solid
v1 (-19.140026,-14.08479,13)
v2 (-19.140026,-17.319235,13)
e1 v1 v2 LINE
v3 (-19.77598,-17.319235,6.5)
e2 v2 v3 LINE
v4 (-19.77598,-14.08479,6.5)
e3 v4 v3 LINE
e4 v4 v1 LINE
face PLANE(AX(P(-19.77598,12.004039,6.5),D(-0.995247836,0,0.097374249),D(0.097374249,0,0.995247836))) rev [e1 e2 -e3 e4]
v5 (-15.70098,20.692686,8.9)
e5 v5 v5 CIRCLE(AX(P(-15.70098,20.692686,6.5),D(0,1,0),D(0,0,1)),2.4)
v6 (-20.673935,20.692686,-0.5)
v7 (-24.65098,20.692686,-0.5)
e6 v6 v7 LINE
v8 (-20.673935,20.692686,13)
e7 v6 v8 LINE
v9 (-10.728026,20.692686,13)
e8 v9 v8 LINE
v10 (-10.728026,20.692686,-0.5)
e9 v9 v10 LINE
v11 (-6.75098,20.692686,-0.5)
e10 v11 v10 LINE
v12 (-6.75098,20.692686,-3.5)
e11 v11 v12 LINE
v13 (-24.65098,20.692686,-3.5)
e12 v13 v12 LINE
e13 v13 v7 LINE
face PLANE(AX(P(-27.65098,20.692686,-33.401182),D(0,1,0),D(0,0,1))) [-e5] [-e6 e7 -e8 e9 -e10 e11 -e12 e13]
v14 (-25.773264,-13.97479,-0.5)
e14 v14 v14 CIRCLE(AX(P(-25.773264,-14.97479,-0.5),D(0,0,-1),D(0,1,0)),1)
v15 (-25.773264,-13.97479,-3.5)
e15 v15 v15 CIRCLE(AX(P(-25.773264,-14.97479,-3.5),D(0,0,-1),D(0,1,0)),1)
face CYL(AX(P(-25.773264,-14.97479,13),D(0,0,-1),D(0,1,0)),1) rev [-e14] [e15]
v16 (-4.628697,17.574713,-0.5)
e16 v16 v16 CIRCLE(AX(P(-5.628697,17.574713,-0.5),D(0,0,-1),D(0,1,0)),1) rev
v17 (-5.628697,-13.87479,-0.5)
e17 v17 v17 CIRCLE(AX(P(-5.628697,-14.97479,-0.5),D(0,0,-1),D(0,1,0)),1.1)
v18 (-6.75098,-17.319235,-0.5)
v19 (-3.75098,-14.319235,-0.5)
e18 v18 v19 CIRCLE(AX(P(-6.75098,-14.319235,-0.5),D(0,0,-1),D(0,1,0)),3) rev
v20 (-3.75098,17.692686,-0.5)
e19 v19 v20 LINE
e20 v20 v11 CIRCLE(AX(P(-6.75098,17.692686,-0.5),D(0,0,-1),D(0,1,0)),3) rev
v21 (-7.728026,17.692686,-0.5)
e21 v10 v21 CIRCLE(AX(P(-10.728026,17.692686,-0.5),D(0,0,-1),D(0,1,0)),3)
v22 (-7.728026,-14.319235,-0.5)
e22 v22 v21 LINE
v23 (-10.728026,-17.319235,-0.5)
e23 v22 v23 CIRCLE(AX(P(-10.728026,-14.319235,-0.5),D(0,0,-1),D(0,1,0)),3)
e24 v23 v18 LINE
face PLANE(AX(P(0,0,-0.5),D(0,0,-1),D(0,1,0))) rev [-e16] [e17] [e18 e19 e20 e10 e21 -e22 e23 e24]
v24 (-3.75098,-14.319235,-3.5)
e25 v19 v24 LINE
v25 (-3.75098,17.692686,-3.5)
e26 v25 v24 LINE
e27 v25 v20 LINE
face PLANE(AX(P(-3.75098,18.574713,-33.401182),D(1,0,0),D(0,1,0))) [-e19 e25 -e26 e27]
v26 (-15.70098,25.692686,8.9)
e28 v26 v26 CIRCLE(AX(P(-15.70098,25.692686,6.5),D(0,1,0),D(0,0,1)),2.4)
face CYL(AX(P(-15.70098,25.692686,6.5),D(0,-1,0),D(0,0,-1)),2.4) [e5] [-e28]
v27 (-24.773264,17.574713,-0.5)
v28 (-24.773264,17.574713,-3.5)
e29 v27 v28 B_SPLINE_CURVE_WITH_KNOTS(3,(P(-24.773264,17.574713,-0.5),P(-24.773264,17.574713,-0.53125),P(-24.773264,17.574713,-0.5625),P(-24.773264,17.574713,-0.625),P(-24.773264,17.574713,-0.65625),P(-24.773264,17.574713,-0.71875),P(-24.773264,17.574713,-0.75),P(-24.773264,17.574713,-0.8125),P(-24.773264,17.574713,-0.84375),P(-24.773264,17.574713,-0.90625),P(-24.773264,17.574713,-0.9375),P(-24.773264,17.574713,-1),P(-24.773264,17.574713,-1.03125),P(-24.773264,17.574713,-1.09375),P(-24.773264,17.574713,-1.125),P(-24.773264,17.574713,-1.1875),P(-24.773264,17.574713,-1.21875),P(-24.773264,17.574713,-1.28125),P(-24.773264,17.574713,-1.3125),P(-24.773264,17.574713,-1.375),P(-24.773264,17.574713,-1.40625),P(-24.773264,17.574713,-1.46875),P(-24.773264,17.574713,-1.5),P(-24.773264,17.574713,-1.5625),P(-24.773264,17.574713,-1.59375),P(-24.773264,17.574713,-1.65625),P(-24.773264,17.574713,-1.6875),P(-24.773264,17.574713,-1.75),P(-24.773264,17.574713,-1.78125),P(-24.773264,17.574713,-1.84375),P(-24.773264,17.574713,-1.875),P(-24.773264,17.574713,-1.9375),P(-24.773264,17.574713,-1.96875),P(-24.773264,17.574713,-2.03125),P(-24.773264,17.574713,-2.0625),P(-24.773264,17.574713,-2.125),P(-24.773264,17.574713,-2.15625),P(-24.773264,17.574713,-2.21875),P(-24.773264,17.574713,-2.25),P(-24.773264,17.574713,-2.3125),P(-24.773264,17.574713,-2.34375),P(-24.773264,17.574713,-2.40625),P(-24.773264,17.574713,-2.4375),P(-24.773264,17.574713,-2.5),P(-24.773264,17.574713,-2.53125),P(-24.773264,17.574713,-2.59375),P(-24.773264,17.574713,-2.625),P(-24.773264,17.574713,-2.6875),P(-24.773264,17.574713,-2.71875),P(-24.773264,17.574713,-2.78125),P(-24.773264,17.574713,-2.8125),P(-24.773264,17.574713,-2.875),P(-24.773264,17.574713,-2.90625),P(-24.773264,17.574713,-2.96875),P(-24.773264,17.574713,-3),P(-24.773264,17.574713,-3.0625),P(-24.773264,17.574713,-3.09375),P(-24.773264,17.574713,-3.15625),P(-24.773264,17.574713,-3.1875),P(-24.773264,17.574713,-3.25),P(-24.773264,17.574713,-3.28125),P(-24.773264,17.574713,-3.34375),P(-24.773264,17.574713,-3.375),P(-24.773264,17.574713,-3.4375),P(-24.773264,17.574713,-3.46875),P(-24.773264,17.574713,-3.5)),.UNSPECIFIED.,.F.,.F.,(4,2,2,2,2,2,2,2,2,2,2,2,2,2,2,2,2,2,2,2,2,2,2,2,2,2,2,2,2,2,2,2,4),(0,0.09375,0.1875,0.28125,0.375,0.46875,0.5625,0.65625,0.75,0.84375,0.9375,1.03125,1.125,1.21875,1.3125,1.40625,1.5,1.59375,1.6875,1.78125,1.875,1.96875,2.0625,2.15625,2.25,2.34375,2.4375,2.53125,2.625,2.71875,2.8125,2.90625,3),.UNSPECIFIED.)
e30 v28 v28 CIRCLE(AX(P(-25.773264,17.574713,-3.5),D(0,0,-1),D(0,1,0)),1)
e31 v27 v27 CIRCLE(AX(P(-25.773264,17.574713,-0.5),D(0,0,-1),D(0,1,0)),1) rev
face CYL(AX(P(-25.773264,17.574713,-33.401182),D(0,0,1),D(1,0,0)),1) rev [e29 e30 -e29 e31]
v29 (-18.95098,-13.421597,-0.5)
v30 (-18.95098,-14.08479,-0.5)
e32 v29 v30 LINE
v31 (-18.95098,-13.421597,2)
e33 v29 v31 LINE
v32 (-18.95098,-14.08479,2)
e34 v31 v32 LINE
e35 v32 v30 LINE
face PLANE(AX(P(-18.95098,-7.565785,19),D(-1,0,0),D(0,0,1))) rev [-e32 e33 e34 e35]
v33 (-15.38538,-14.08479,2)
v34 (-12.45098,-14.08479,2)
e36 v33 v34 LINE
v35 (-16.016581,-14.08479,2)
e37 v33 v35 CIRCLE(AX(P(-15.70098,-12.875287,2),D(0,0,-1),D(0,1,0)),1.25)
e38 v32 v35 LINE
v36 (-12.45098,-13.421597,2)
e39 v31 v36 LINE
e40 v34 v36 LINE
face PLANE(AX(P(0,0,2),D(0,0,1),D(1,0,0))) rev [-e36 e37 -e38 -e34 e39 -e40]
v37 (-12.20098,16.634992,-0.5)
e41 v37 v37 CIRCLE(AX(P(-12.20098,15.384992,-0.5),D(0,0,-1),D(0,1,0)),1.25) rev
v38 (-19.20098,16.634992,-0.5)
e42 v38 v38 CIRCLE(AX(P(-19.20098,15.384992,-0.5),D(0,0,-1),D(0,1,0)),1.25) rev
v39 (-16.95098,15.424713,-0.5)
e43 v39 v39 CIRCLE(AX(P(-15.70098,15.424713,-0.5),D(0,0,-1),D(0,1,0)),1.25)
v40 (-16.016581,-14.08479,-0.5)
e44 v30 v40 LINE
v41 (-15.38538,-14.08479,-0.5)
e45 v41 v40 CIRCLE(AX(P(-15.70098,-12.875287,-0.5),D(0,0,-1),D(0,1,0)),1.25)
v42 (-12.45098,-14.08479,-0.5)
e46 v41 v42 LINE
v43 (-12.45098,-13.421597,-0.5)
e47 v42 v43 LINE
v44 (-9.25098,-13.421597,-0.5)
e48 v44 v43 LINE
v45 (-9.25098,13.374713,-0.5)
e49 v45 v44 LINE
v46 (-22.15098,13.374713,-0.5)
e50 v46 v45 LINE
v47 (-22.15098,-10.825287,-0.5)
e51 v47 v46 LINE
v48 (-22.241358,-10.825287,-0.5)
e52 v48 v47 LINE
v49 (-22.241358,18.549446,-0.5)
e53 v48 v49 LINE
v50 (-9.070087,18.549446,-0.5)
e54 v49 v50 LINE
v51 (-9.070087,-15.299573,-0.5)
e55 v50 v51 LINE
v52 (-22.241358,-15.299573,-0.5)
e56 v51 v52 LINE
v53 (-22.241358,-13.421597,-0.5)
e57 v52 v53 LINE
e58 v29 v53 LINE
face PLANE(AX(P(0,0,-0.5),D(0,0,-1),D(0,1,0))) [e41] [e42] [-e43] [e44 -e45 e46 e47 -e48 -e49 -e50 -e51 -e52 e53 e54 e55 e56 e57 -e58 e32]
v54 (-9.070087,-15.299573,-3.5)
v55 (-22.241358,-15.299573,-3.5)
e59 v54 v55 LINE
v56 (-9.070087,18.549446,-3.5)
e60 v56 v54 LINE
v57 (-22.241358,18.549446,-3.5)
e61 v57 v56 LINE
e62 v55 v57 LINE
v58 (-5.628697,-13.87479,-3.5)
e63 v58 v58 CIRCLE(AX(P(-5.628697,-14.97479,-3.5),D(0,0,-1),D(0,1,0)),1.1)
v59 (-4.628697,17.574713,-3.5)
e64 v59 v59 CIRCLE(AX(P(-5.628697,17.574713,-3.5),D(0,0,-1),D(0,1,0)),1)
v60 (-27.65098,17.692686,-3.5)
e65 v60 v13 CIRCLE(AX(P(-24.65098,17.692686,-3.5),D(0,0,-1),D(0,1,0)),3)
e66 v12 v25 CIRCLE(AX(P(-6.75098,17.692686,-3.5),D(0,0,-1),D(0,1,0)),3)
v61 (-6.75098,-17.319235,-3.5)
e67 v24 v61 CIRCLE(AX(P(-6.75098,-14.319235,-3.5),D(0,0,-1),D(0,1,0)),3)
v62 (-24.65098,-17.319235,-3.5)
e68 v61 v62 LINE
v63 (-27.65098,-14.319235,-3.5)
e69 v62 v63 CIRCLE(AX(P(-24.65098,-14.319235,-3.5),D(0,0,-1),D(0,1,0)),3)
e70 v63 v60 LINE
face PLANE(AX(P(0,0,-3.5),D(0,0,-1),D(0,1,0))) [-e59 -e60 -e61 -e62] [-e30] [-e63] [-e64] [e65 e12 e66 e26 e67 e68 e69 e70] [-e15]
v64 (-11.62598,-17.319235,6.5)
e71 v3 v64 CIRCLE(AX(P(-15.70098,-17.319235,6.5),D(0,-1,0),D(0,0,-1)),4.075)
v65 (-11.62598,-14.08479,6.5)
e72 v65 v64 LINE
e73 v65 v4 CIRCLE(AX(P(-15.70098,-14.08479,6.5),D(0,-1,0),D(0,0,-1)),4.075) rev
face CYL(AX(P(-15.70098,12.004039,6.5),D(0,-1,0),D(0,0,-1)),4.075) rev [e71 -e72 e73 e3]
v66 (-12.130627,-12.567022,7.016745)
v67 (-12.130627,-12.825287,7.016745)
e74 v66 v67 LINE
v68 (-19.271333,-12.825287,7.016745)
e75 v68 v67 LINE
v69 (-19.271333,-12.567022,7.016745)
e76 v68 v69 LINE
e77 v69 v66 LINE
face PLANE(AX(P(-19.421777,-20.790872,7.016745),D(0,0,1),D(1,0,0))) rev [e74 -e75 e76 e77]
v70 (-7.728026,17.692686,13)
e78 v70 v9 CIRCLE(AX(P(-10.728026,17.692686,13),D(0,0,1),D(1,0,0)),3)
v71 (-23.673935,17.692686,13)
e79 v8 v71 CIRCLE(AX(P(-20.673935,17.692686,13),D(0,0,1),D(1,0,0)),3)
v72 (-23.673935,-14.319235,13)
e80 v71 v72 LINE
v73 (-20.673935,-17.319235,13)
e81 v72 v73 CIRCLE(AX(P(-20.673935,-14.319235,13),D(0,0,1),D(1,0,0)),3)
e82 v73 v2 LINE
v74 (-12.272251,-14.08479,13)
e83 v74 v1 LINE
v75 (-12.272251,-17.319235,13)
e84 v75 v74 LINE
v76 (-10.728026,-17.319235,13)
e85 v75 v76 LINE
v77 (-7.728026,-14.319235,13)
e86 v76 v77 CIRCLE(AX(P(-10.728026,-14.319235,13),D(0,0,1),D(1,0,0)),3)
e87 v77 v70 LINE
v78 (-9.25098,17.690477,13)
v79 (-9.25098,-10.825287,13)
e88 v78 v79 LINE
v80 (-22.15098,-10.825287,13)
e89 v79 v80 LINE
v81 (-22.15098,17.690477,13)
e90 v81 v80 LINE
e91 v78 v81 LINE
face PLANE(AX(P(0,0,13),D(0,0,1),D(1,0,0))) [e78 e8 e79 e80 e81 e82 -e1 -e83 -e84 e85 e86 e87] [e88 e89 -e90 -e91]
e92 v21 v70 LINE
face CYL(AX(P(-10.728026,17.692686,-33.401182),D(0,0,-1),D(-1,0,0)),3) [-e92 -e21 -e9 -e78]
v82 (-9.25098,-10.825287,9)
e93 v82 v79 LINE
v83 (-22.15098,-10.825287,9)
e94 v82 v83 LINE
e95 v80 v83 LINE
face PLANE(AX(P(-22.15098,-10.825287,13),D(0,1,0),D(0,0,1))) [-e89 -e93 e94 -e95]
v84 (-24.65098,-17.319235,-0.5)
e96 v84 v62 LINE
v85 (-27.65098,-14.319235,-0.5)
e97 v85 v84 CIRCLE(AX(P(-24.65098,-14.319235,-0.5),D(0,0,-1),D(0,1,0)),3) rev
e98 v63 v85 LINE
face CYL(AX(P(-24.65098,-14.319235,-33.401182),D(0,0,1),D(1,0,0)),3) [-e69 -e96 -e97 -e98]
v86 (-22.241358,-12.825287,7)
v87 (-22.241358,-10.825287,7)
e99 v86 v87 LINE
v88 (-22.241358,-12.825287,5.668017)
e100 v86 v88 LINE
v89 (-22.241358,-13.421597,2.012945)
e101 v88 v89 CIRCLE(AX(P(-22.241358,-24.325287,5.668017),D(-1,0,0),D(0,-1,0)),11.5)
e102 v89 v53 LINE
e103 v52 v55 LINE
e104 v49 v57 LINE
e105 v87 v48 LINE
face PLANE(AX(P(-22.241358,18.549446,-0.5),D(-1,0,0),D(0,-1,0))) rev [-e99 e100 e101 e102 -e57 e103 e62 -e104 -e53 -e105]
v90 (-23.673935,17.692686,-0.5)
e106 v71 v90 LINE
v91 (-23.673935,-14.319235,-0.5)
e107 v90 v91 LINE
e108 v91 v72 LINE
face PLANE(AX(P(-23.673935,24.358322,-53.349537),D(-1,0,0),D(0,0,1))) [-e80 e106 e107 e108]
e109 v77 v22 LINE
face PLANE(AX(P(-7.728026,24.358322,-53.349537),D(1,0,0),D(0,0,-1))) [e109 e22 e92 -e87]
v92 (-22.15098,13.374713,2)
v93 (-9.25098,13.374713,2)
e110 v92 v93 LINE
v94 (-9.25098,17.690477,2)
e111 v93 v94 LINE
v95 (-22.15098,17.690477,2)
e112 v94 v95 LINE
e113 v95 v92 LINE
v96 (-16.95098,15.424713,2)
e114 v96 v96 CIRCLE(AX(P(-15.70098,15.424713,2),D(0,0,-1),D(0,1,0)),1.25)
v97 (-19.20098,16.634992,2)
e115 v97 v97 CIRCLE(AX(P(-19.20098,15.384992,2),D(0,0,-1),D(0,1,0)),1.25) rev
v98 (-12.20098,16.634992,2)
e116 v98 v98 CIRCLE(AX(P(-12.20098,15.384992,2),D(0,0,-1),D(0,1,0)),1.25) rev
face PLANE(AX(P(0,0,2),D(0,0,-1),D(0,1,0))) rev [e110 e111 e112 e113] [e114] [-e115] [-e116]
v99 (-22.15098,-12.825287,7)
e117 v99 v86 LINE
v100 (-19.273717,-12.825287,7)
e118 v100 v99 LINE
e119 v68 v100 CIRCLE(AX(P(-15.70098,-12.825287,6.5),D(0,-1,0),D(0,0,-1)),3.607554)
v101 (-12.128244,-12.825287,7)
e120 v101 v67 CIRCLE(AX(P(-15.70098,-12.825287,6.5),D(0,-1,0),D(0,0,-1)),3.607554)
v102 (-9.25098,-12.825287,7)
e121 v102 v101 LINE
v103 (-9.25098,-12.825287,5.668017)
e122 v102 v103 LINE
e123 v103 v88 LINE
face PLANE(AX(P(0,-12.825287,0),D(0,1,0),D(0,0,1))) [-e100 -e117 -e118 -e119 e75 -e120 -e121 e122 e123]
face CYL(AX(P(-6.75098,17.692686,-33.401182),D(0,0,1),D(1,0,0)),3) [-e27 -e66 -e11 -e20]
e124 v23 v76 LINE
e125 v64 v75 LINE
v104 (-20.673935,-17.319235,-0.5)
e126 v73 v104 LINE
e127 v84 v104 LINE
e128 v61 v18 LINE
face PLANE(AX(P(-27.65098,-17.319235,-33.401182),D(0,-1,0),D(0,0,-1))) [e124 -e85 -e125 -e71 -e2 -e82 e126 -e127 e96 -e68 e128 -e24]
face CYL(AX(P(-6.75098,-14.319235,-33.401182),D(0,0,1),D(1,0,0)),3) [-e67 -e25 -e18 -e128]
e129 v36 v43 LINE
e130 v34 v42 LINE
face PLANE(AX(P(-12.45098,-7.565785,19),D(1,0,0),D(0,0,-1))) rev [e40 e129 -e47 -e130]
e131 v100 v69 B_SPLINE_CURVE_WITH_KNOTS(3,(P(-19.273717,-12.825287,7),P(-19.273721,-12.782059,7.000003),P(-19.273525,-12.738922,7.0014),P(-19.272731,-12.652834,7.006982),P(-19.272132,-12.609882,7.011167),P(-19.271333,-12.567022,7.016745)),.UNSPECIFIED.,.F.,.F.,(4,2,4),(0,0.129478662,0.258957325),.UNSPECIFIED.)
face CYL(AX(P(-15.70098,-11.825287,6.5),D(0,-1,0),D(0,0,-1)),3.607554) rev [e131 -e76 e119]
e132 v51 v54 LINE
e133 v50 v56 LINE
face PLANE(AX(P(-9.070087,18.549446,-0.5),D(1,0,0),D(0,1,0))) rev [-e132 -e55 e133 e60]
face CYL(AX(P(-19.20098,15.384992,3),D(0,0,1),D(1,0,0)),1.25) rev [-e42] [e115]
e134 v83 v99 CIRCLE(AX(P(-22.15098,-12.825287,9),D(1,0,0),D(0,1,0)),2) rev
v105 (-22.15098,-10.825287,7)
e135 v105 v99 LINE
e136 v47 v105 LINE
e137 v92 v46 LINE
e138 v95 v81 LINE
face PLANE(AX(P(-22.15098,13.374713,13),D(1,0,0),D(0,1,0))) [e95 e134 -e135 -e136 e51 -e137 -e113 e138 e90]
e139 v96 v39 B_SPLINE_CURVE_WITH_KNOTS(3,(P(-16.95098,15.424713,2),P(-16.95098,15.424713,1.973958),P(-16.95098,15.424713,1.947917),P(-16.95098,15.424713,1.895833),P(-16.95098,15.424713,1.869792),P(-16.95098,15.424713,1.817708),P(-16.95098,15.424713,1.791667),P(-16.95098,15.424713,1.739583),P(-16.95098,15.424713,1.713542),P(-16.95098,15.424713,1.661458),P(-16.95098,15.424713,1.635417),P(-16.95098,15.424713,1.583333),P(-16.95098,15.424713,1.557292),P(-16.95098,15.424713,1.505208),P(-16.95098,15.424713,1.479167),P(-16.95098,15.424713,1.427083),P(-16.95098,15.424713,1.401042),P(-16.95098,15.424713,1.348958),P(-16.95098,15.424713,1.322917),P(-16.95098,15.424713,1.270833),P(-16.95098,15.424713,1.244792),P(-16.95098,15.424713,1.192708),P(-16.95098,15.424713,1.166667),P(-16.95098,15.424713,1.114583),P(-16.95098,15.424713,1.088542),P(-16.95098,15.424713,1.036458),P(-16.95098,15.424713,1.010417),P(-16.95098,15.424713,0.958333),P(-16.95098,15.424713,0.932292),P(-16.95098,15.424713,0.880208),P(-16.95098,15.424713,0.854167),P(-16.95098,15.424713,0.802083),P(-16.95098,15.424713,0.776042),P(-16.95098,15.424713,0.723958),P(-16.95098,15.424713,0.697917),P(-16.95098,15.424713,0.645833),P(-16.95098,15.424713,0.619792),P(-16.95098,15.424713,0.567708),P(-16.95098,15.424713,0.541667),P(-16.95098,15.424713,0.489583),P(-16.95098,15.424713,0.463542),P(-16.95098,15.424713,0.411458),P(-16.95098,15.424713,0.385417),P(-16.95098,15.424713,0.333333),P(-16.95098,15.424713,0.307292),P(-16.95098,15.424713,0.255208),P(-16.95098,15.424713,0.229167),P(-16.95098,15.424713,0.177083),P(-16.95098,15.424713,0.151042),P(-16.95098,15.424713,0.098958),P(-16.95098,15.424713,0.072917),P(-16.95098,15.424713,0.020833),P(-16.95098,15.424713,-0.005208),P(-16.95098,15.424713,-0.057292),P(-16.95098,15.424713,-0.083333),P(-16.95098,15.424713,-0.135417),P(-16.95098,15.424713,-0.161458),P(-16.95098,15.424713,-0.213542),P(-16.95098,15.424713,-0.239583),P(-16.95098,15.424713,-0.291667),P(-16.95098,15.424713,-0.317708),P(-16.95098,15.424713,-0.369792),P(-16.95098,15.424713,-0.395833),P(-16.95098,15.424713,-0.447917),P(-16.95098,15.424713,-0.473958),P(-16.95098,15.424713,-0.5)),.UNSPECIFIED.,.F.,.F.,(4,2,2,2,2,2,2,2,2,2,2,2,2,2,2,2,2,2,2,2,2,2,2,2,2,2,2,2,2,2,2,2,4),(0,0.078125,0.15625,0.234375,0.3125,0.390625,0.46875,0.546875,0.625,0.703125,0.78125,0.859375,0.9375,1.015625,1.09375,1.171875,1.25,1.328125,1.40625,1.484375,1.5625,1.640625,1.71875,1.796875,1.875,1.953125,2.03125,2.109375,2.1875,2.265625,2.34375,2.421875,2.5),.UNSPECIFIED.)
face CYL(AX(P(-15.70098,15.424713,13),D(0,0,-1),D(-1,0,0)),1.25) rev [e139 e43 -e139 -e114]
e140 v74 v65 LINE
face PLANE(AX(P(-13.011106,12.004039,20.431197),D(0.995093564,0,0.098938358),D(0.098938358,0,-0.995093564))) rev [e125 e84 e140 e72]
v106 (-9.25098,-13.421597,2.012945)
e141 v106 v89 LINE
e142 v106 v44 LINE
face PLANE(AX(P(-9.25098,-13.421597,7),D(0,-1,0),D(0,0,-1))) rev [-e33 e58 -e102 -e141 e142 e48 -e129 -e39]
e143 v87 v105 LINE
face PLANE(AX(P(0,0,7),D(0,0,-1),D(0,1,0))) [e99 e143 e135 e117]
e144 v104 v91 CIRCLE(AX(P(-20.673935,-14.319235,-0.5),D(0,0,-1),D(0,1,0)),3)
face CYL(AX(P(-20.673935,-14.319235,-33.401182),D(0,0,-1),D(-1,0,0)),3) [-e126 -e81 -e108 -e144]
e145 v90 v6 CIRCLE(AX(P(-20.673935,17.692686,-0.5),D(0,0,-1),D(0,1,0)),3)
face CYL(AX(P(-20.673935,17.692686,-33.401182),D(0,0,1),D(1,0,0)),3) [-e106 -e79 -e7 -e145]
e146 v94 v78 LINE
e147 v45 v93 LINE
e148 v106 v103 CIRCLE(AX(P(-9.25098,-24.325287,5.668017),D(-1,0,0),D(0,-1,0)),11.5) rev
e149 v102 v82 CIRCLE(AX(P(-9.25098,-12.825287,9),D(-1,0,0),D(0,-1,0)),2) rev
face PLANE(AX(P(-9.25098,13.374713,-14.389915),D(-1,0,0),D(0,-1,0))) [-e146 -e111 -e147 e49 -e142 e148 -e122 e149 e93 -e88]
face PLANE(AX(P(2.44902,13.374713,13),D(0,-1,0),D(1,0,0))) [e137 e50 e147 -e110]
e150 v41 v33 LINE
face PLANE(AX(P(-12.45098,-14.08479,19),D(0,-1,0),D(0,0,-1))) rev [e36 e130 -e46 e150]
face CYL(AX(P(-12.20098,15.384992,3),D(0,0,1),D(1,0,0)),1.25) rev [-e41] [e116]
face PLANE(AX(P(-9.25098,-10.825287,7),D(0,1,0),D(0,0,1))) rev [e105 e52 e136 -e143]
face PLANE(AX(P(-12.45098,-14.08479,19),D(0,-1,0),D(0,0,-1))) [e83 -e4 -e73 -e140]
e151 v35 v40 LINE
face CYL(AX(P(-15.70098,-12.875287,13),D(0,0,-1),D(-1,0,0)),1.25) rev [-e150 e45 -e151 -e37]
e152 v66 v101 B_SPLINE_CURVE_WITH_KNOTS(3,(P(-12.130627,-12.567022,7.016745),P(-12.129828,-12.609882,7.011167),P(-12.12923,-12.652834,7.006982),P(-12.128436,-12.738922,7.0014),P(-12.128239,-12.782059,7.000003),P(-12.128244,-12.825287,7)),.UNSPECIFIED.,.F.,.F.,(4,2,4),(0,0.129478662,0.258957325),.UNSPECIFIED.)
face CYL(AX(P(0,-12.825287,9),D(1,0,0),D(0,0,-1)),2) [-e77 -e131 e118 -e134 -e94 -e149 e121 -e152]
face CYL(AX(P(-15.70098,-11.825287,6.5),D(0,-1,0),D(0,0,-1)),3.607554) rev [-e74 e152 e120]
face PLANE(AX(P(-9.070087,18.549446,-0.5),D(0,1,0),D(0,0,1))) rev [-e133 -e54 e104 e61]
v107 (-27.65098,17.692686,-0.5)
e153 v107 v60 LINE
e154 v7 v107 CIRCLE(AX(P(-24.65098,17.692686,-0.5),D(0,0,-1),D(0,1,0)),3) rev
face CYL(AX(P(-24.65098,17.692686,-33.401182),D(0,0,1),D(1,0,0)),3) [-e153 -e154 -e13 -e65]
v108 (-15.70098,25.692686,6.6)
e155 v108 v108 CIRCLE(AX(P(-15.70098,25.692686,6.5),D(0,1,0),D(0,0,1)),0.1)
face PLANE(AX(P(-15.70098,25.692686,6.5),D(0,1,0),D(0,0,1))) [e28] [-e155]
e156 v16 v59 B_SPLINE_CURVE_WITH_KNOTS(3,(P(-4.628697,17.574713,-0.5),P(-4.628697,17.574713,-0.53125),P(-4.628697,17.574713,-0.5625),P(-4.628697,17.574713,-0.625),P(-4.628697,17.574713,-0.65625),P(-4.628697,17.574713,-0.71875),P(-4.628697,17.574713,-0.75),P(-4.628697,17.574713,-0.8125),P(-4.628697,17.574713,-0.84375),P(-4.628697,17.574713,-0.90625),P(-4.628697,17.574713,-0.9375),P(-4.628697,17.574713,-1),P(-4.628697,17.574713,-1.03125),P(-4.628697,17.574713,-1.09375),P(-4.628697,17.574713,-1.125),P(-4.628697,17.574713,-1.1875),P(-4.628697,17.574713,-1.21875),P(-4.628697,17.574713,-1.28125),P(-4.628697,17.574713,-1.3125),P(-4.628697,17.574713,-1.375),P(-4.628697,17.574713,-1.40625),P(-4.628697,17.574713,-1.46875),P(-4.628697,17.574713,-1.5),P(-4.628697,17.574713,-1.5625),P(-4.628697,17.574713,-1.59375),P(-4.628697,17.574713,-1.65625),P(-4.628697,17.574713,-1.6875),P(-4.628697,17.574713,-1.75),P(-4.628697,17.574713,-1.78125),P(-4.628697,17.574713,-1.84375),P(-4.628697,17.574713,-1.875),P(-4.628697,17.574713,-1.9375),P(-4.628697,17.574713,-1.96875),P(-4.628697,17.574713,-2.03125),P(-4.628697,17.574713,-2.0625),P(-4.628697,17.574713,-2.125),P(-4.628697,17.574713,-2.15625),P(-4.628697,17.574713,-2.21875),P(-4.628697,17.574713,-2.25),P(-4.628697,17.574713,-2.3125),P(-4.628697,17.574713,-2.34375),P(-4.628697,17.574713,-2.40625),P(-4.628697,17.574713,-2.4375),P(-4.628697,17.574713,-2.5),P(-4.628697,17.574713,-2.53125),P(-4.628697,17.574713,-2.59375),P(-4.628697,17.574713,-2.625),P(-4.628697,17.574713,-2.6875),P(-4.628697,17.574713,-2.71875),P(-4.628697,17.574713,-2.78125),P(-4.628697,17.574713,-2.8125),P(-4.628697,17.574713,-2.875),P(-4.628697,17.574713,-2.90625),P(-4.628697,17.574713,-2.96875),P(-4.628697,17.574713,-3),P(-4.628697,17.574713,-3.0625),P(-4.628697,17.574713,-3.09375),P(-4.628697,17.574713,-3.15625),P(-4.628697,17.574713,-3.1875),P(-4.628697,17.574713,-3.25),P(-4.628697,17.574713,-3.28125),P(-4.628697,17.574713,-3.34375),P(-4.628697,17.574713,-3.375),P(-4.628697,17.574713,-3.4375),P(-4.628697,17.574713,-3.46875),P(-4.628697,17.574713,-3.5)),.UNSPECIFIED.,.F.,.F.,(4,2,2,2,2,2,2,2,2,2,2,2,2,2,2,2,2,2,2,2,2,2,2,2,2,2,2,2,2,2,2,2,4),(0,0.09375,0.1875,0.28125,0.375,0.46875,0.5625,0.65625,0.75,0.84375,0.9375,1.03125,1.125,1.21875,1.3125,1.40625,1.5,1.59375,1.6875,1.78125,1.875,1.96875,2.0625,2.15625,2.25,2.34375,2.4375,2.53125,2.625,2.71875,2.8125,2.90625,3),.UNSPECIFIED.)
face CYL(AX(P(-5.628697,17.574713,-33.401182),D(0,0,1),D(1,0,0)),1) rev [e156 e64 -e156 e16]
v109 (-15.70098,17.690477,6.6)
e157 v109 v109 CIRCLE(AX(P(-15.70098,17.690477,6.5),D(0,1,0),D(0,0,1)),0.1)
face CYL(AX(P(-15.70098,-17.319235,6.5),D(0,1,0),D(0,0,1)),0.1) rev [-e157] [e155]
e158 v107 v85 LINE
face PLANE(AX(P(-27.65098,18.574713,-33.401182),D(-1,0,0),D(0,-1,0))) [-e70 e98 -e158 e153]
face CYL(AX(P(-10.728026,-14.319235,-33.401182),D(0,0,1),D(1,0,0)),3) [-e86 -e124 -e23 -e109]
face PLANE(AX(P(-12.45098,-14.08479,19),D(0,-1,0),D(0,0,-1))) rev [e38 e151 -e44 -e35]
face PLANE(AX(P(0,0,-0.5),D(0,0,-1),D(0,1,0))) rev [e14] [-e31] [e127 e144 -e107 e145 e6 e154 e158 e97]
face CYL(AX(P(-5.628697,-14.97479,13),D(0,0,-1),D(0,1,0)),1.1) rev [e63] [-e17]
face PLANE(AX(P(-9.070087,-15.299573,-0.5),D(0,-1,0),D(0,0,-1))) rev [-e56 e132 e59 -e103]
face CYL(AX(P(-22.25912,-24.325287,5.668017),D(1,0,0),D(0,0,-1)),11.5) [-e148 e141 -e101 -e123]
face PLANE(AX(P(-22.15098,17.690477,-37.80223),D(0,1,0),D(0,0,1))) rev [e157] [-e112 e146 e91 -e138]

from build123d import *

# Parameters (mm, degrees)
SKETCH_1_W                = 32.6
SKETCH_1_H                = 34.6
SKETCH_1_R                = 1.25
SKETCH_1_W_2              = 24.6
SKETCH_1_H_2              = 24.2
EXTRUDE_1_DEPTH           = 13
SKETCH_3_W                = 6.5
SKETCH_3_H                = 6.519005167
CUT_EXTRUDE_1_DEPTH       = 19
SKETCH_4_W                = 6.5
SKETCH_4_H                = 6.467668889
CUT_EXTRUDE_2_DEPTH       = 23
EXTRUDE_2_DEPTH           = 50
SKETCH_1_2_W              = 22.27659965
SKETCH_1_2_H              = 4.598586669
SKETCH_1_2_W_2            = 22.283050596
SKETCH_1_2_H_2            = 4.977540741
CUT_EXTRUDE_5_DEPTH       = 34
FILLET_1_R                = 2
FILLET_2_R                = 2
SKETCH_9_W                = 54.594998093
SKETCH_9_H                = 18.111982385
SKETCH_9_W_2              = 52.534809486
SKETCH_9_H_2              = 12.989301534
CUT_EXTRUDE_6_DEPTH       = 41
FILLET_6_R                = 22
EXTRUDE_4_DEPTH           = 13
SKETCH_13_W               = 5.518907879
SKETCH_13_H               = 8.361822047
CUT_EXTRUDE_8_DEPTH       = 8.5
SKETCH_14_W               = 6.038657432
SKETCH_14_H               = 7.741248121
CUT_EXTRUDE_9_DEPTH       = 8.5
SKETCH_23_OUTSIDE_W       = 35.102
SKETCH_23_OUTSIDE_H       = 56.702
SKETCH_23_OUTSIDE_W_2     = 1.5
SKETCH_23_OUTSIDE_H_2     = 34.6
CUT_EXTRUDE_10_DEPTH      = 104
SKETCH_24_W               = 10.341780897
SKETCH_24_H               = 5.2
SKETCH_24_R               = 1.25
EXTRUDE_5_DEPTH           = 1.5
SKETCH_25_R               = 1.25
CUT_EXTRUDE_11_DEPTH      = 104
SKETCH_26_OUTSIDE_W       = 115.402
SKETCH_26_OUTSIDE_H       = 56.536
SKETCH_26_OUTSIDE_W_2     = 17.268409177
SKETCH_26_OUTSIDE_H_2     = 34.6
CUT_EXTRUDE_12_DEPTH      = 10
SKETCH_27_W               = 2.368409177
SKETCH_27_H               = 25.781356428
EXTRUDE_6_DEPTH           = 1.5
SKETCH_28_R               = 1.25
CUT_EXTRUDE_13_DEPTH      = 10
CUT_EXTRUDE_START         = -1.5
CUT_EXTRUDE_14_OUTLINE_W  = 0.368409177
CUT_EXTRUDE_14_OUTLINE_H  = 34.6
CUT_EXTRUDE_14_DEPTH      = 1.5
SKETCH_30_R               = 1.1
SKETCH_30_R_2             = 1
SKETCH_30_W               = 15.411127821
SKETCH_30_H               = 34.6
EXTRUDE_7_DEPTH           = 1.5
SKETCH_33_W               = 23.9
SKETCH_33_H               = 38.011921137
SKETCH_33_R               = 1.25
SKETCH_33_R_2             = 1
EXTRUDE_8_DEPTH           = 15
SKETCH_34_OUTSIDE_W       = 35.468
SKETCH_34_OUTSIDE_H       = 49.58
SKETCH_34_OUTSIDE_W_2     = 15.945908464
SKETCH_34_OUTSIDE_H_2     = 43.183358486
CUT_EXTRUDE_15_DEPTH      = 13.5
SKETCH_35_W               = 12.9
SKETCH_35_H               = 31.784162084
CUT_EXTRUDE_16_DEPTH      = 11
SKETCH_37_R               = 2.4
EXTRUDE_9_DEPTH           = 5
SKETCH_39_W               = 13.171271292
SKETCH_39_H               = 33.849019387
CUT_EXTRUDE_17_DEPTH      = 3
FILLET_7_R                = 3
CUT_EXTRUDE_18_DEPTH      = 53.759852886
CUT_EXTRUDE_18_DEPTH_BACK = 53.759852886
SKETCH_40_R               = 0.1
SKETCH_42_W               = 13.648654979
SKETCH_42_H               = 4.665334349
EXTRUDE_10_DEPTH          = 11
CUT_EXTRUDE_19_DEPTH      = 4.493948053
SKETCH_43_R               = 3.607554058
CUT_EXTRUDE_20_DEPTH      = 1
SKETCH_44_W               = 12.990377478
SKETCH_44_H               = 2.596310078
CUT_EXTRUDE_21_DEPTH      = 7.5
SKETCH_46_W               = 13.018615597
SKETCH_46_H               = 10.987054625
EXTRUDE_11_DEPTH          = 1.259502583
SKETCH_48_W               = 7.320827495
SKETCH_48_H               = 3.139430645
EXTRUDE_12_DEPTH          = 1
FILLET_9_R                = 11.5
FILLET_11_R               = 2
FILLET_12_R               = 3
SKETCH_49_R               = 1.1
SKETCH_49_R_2             = 1
CUT_EXTRUDE_22_DEPTH      = 42.193941463


# Read off the part's stored shape, not the designer's step: 切除-拉伸14
with BuildPart() as part:
    # Sketch 1 → 凸台-拉伸1 (new body)
    with BuildSketch(Plane.XY):
        with Locations((-9.850980392, 1.274712581)):
            Rectangle(SKETCH_1_W, SKETCH_1_H)
        with Locations(Location((-15.700980392, 15.424712581, 0), (0, 0, 180))):
            Circle(SKETCH_1_R, mode=Mode.SUBTRACT)
        with Locations(Location((-3.600980392, 15.424712581, 0), (0, 0, 180))):
            Circle(SKETCH_1_R, mode=Mode.SUBTRACT)
        with Locations(Location((-15.700980392, -12.875287419, 0), (0, 0, 180))):
            Circle(SKETCH_1_R, mode=Mode.SUBTRACT)
        with Locations(Location((-3.600980392, -12.875287419, 0), (0, 0, 180))):
            Circle(SKETCH_1_R, mode=Mode.SUBTRACT)
        with Locations((-9.850980392, 1.274712581)):
            Rectangle(SKETCH_1_W_2, SKETCH_1_H_2, mode=Mode.SUBTRACT)
    extrude(amount=EXTRUDE_1_DEPTH)

    # 草图3 → 切除-拉伸1 (cut)
    with BuildSketch(Plane(origin=(0, 0, 0), x_dir=(-1, 0, 0), z_dir=(0, 0, -1))):
        with Locations((15.700980392, -10.82528742)):
            Rectangle(SKETCH_3_W, SKETCH_3_H)
    extrude(amount=-CUT_EXTRUDE_1_DEPTH, mode=Mode.SUBTRACT)

    # 草图4 → 切除-拉伸2 (cut)
    with BuildSketch(Plane.XY.offset(13)):
        with Locations((-3.600980392, -10.82528742)):
            Rectangle(SKETCH_4_W, SKETCH_4_H)
    extrude(amount=-CUT_EXTRUDE_2_DEPTH, mode=Mode.SUBTRACT)

    # 草图5 → 凸台-拉伸2 (add)
    with BuildSketch(Plane(origin=(6.449019608, 0, 0), x_dir=(0, 0, -1), z_dir=(1, 0, 0))):
        Polygon((-13, 18.574712581), (-13, 10.055461473), (-13, -16.025287419), (0, -16.025287419), (0, -15.027567927), (0, 16.282461831), (0, 18.574712581), align=None)
    extrude(amount=EXTRUDE_2_DEPTH)

    # Sketch 1 2 → 切除-拉伸5 (cut)
    with BuildSketch(Plane.XY.offset(13)):
        with Locations((24.037173058, -7.263594431)):
            Rectangle(SKETCH_1_2_W, SKETCH_1_2_H)
        with Locations((24.078382453, 0.81654228)):
            Rectangle(SKETCH_1_2_W_2, SKETCH_1_2_H_2)
    extrude(amount=-CUT_EXTRUDE_5_DEPTH, mode=Mode.SUBTRACT)

    # 圆角1
    fillet_1_edges = [part.edges().sort_by_distance(p)[0] for p in [
        (12.936857155, -1.672228091, 6.5),
        (12.936857155, 3.30531265, 6.5),
        (35.219907751, 3.30531265, 6.5),
        (35.219907751, -1.672228091, 6.5),
        (12.898873233, -9.562887765, 6.5),
        (12.898873233, -4.964301096, 6.5),
        (35.175472883, -4.964301096, 6.5),
        (35.175472883, -9.562887765, 6.5),
    ]]
    fillet(fillet_1_edges, radius=FILLET_1_R)

    # 圆角2
    fillet_2_edges = [part.edges().sort_by_distance(p)[0] for p in [
        (-26.150980392, -16.025287419, 6.5),
        (-26.150980392, 18.574712581, 6.5),
    ]]
    fillet(fillet_2_edges, radius=FILLET_2_R)

    # 草图9 → 切除-拉伸6 (cut)
    with BuildSketch(Plane(origin=(0, 0, 0), x_dir=(-1, 0, 0), z_dir=(0, 0, -1))):
        with Locations((-36.934177516, 16.051357777)):
            Rectangle(SKETCH_9_W, SKETCH_9_H)
        with Locations((-36.653242706, -19.247200889)):
            Rectangle(SKETCH_9_W_2, SKETCH_9_H_2)
    extrude(amount=-CUT_EXTRUDE_6_DEPTH, mode=Mode.SUBTRACT)

    # 圆角6
    # the kernel refuses this fillet: 22 mm, written as the material it adds along each edge
    with BuildSketch(Plane(origin=(9.636678469, 6.995366584, 0), x_dir=(0, 1, 0), z_dir=(0, 0, 1))) as fillet_6_piece_1:
        with BuildLine():
            CenterArc((22, -19.375499223), FILLET_6_R, 118.272534833, 61.727465167)
            Line((0, -19.375499223), (-0.44, -19.375499223))
            Line((-0.44, -19.375499223), (-0.44, 0))
            Line((-0.44, 0), (0, 0.44))
            ThreePointArc((0, 0.44), (5.789672998, 0.44), (11.370932916, 0.387509984))
            Line((11.370932916, 0.387509984), (11.579345996, 0))
        make_face()
    extrude(amount=13)
    with BuildSketch(Plane(origin=(10.385837963, -12.752550122, 0), x_dir=(1, 0, 0), z_dir=(0, 0, 1))) as fillet_6_piece_2:
        with BuildLine():
            CenterArc((11.54511289, -22), FILLET_6_R, 90, 31.653290012)
            Line((0, -3.272737297), (-0.230902258, -2.898192043))
            ThreePointArc((-0.230902258, -2.898192043), (-0.44, -1.636368649), (-0.44, 0))
            Line((-0.44, 0), (0, 0.44))
            Line((0, 0.44), (11.54511289, 0.44))
            Line((11.54511289, 0.44), (11.54511289, 0))
        make_face()
    extrude(amount=13)

    # 草图12 → 凸台-拉伸4 (add)
    with BuildSketch(Plane(origin=(0, 0, 0), x_dir=(-1, 0, 0), z_dir=(0, 0, -1))):
        with BuildLine():
            Line((24.150980392, 18.574712581), (24.496655084, -15.99518818))
            ThreePointArc((24.496655084, -15.99518818), (37.015647173, 1.416671567), (24.150980392, 18.574712581))
        make_face()
        with BuildLine():
            Line((26.822698684, 1.289948959), (26.822698684, -8.431688638))
            ThreePointArc((26.822698684, -8.431688638), (32.027920461, 1.289948959), (26.822698684, 11.011586556))
            Line((26.822698684, 11.011586556), (26.822698684, 1.289948959))
        make_face(mode=Mode.SUBTRACT)
    extrude(amount=-EXTRUDE_4_DEPTH)

    # 草图13 → 切除-拉伸8 (cut)
    with BuildSketch(Plane.XY.offset(13)):
        with Locations((-3.600980393, 15.424712581)):
            Rectangle(SKETCH_13_W, SKETCH_13_H)
    extrude(amount=-CUT_EXTRUDE_8_DEPTH, mode=Mode.SUBTRACT)

    # 草图14 → 切除-拉伸9 (cut)
    with BuildSketch(Plane(origin=(0, 0, 0), x_dir=(-1, 0, 0), z_dir=(0, 0, -1))):
        with Locations((15.700980392, 15.424712581)):
            Rectangle(SKETCH_14_W, SKETCH_14_H)
    extrude(amount=-CUT_EXTRUDE_9_DEPTH, mode=Mode.SUBTRACT)

    # 草图23 outside → 切除-拉伸10 (cut)
    with BuildSketch(Plane(origin=(56.449019608, 0, 0), x_dir=(0, 0, -1), z_dir=(1, 0, 0))):
        with Locations((-6.5, 1.275)):
            Rectangle(SKETCH_23_OUTSIDE_W, SKETCH_23_OUTSIDE_H)
        with Locations((-12.25, 1.274712581)):
            Rectangle(SKETCH_23_OUTSIDE_W_2, SKETCH_23_OUTSIDE_H_2, mode=Mode.SUBTRACT)
    extrude(amount=-CUT_EXTRUDE_10_DEPTH, mode=Mode.SUBTRACT)

    # 草图24 → 凸台-拉伸5 (add)
    with BuildSketch(Plane.XY.offset(13)):
        with Locations((-4.17557206, 15.974712581)):
            Rectangle(SKETCH_24_W, SKETCH_24_H)
        with Locations((-3.600980392, 15.429779286)):
            Circle(SKETCH_24_R, mode=Mode.SUBTRACT)
    extrude(amount=-EXTRUDE_5_DEPTH)

    # 草图25 → 切除-拉伸11 (cut)
    with BuildSketch(Plane.XY.offset(13)):
        with Locations((42.624971711, -3.793205976)):
            Circle(SKETCH_25_R)
        with Locations((-34.434765713, 1.289948959)):
            Circle(SKETCH_25_R)
        with Locations((-25.484048207, 14.316394652)):
            Circle(SKETCH_25_R)
        with Locations((-25.484048207, -12.050711449)):
            Circle(SKETCH_25_R)
    extrude(amount=-CUT_EXTRUDE_11_DEPTH, mode=Mode.SUBTRACT)

    # 草图26 outside → 切除-拉伸12 (cut)
    with BuildSketch(Plane.XY.offset(13)):
        with Locations((9.716, 1.275)):
            Rectangle(SKETCH_26_OUTSIDE_W, SKETCH_26_OUTSIDE_H)
        with Locations((-15.516775803, 1.274712581)):
            Rectangle(SKETCH_26_OUTSIDE_W_2, SKETCH_26_OUTSIDE_H_2, mode=Mode.SUBTRACT)
    extrude(amount=-CUT_EXTRUDE_12_DEPTH, mode=Mode.SUBTRACT)

    # 草图27 → 凸台-拉伸6 (add)
    with BuildSketch(Plane.XY.offset(13)):
        with Locations((-8.066775804, 0.484034367)):
            Rectangle(SKETCH_27_W, SKETCH_27_H)
    extrude(amount=-EXTRUDE_6_DEPTH)

    # 草图28 → 切除-拉伸13 (cut)
    with BuildSketch(Plane.XY.offset(13)):
        with Locations((-19.200980392, 15.384992379)):
            Circle(SKETCH_28_R)
        with Locations((-12.200980392, 15.384992379)):
            Circle(SKETCH_28_R)
    extrude(amount=-CUT_EXTRUDE_13_DEPTH, mode=Mode.SUBTRACT)

    # 切除-拉伸14 outline → 切除-拉伸14 (cut)
    with BuildSketch(Plane.XY.offset(13).offset(CUT_EXTRUDE_START)):
        with Locations((-7.066775804, 1.274712581)):
            Rectangle(CUT_EXTRUDE_14_OUTLINE_W, CUT_EXTRUDE_14_OUTLINE_H)
    extrude(amount=CUT_EXTRUDE_14_DEPTH, mode=Mode.SUBTRACT)

    # 草图30 → 凸台-拉伸7 (add)
    with BuildSketch(Plane.XY.offset(13)):
        Polygon((-27.650980392, 18.574712581), (-27.650980392, -16.025287419), (-27.650980392, -17.319235473), (-3.750980392, -17.319235473), (-3.750980392, -16.025287419), (-3.750980392, 18.574712581), (-3.750980392, 20.692685664), (-27.650980392, 20.692685664), align=None)
        with Locations((-25.773264037, -15.025287419)):
            Circle(SKETCH_30_R, mode=Mode.SUBTRACT)
        with Locations((-25.773264037, 17.574712581)):
            Circle(SKETCH_30_R_2, mode=Mode.SUBTRACT)
        with Locations((-5.628696747, 17.574712581)):
            Circle(SKETCH_30_R_2, mode=Mode.SUBTRACT)
        with Locations((-5.628696747, -15.025287419)):
            Circle(SKETCH_30_R, mode=Mode.SUBTRACT)
        with Locations((-15.213421192, 1.274712581)):
            Rectangle(SKETCH_30_W, SKETCH_30_H, mode=Mode.SUBTRACT)
    extrude(amount=-EXTRUDE_7_DEPTH)

    # 草图33 → 凸台-拉伸8 (add)
    with BuildSketch(Plane(origin=(0, 0, 11.5), x_dir=(-1, 0, 0), z_dir=(0, 0, -1))):
        with Locations((15.700980392, 1.686725095)):
            Rectangle(SKETCH_33_W, SKETCH_33_H)
        with Locations((15.700980392, 15.424712581)):
            Circle(SKETCH_33_R, mode=Mode.SUBTRACT)
        with Locations(Location((12.200980392, 15.384992379, 0), (0, 0, 180))):
            Circle(SKETCH_33_R, mode=Mode.SUBTRACT)
        with Locations(Location((19.200980392, 15.384992379, 0), (0, 0, 180))):
            Circle(SKETCH_33_R, mode=Mode.SUBTRACT)
        with Locations(Location((25.773264037, 17.574712581, 0), (0, 0, 180))):
            Circle(SKETCH_33_R_2, mode=Mode.SUBTRACT)
        with Locations(Location((5.628696747, 17.574712581, 0), (0, 0, 180))):
            Circle(SKETCH_33_R_2, mode=Mode.SUBTRACT)
        with BuildLine():
            Line((9.250980392, -10.825287419), (12.450980392, -10.825287419))
            Line((12.450980392, -10.825287419), (12.450980392, -14.084790003))
            Line((12.450980392, -14.084790003), (15.385380168, -14.084790003))
            ThreePointArc((15.385380168, -14.084790003), (15.700980392, -14.125287419), (16.016580616, -14.084790003))
            Line((16.016580616, -14.084790003), (18.950980392, -14.084790003))
            Line((18.950980392, -14.084790003), (18.950980392, -10.825287419))
            Line((18.950980392, -10.825287419), (22.150980392, -10.825287419))
            Line((22.150980392, -10.825287419), (22.150980392, 13.374712581))
            Line((22.150980392, 13.374712581), (9.250980392, 13.374712581))
            Line((9.250980392, 13.374712581), (9.250980392, -10.825287419))
        make_face(mode=Mode.SUBTRACT)
    extrude(amount=EXTRUDE_8_DEPTH)

    # 草图34 outside → 切除-拉伸15 (cut)
    with BuildSketch(Plane.XY.offset(13)):
        with Locations((-15.701, 1.687)):
            Rectangle(SKETCH_34_OUTSIDE_W, SKETCH_34_OUTSIDE_H)
        with Locations((-15.700980392, 2.766642636)):
            Rectangle(SKETCH_34_OUTSIDE_W_2, SKETCH_34_OUTSIDE_H_2, mode=Mode.SUBTRACT)
    extrude(amount=-CUT_EXTRUDE_15_DEPTH, mode=Mode.SUBTRACT)

    # 草图35 → 切除-拉伸16 (cut)
    with BuildSketch(Plane.XY.offset(13)):
        with Locations((-15.700980392, 1.798395824)):
            Rectangle(SKETCH_35_W, SKETCH_35_H)
    extrude(amount=-CUT_EXTRUDE_16_DEPTH, mode=Mode.SUBTRACT)

    # 草图37 → 凸台-拉伸9 (add)
    with BuildSketch(Plane(origin=(0, 20.692685664, 0), x_dir=(1, 0, 0), z_dir=(0, 1, 0))):
        with Locations(Location((-15.700980392, -6.5, 0), (0, 0, 270))):
            Circle(SKETCH_37_R)
    extrude(amount=EXTRUDE_9_DEPTH)

    # 草图39 → 切除-拉伸17 (cut)
    with BuildSketch(Plane(origin=(0, 0, -3.5), x_dir=(-1, 0, 0), z_dir=(0, 0, -1))):
        with Locations((15.655722224, 1.624936556)):
            Rectangle(SKETCH_39_W, SKETCH_39_H)
    extrude(amount=-CUT_EXTRUDE_17_DEPTH, mode=Mode.SUBTRACT)

    # 圆角7
    fillet_7_edges = [part.edges().sort_by_distance(p)[0] for p in [
        (-27.650980392, -17.319235473, -2),
        (-27.650980392, 20.692685664, -2),
        (-3.750980392, 20.692685664, -2),
        (-3.750980392, -17.319235473, -2),
    ]]
    fillet(fillet_7_edges, radius=FILLET_7_R)

    # 草图40 → 切除-拉伸18 (cut, two sides: drawn at the far end of the back side and taken through both)
    with BuildSketch(Plane(origin=(0, 25.692685664, 0), x_dir=(1, 0, 0), z_dir=(0, 1, 0)).offset(-CUT_EXTRUDE_18_DEPTH_BACK)):
        with Locations(Location((-15.700980392, -6.5, 0), (0, 0, 270))):
            Circle(SKETCH_40_R)
    extrude(amount=CUT_EXTRUDE_18_DEPTH + CUT_EXTRUDE_18_DEPTH_BACK, mode=Mode.SUBTRACT)

    # 草图42 → 凸台-拉伸10 (add)
    with BuildSketch(Plane.XY.offset(2)):
        with Locations((-15.66246504, -13.157954594)):
            Rectangle(SKETCH_42_W, SKETCH_42_H)
    extrude(amount=EXTRUDE_10_DEPTH)

    # 草图41 → 切除-拉伸19 (cut)
    with BuildSketch(Plane.XZ.offset(17.319235473)):
        with BuildLine():
            Line((-19.775980392, 6.5), (-18.406082759, 20.501521641))
            ThreePointArc((-18.406082759, 20.501521641), (-15.665794747, 23.749766381), (-13.011106202, 20.431197259))
            Line((-13.011106202, 20.431197259), (-11.625980392, 6.5))
            ThreePointArc((-11.625980392, 6.5), (-15.700980392, 2.425), (-19.775980392, 6.5))
        make_face()
    extrude(amount=-CUT_EXTRUDE_19_DEPTH, mode=Mode.SUBTRACT)

    # 草图43 → 切除-拉伸20 (cut)
    with BuildSketch(Plane.XZ.offset(12.825287419)):
        with Locations(Location((-15.700980392, 6.5, 0), (0, 0, 270))):
            Circle(SKETCH_43_R)
    extrude(amount=-CUT_EXTRUDE_20_DEPTH, mode=Mode.SUBTRACT)

    # 草图44 → 切除-拉伸21 (cut)
    with BuildSketch(Plane(origin=(0, 0, -0.5), x_dir=(-1, 0, 0), z_dir=(0, 0, -1))):
        with Locations((15.746169131, -12.123442458)):
            Rectangle(SKETCH_44_W, SKETCH_44_H)
    extrude(amount=-CUT_EXTRUDE_21_DEPTH, mode=Mode.SUBTRACT)

    # 草图46 → 凸台-拉伸11 (add)
    with BuildSketch(Plane.XZ.offset(12.825287419)):
        with Locations((-15.749811773, 7.506472688)):
            Rectangle(SKETCH_46_W, SKETCH_46_H)
    extrude(amount=EXTRUDE_11_DEPTH)

    # 草图48 → 凸台-拉伸12 (add)
    with BuildSketch(Plane.XZ.offset(11.825287419)):
        with Locations((-15.761363582, 8.5864607)):
            Rectangle(SKETCH_48_W, SKETCH_48_H)
    extrude(amount=EXTRUDE_12_DEPTH)

    # 圆角9
    # the kernel refuses this fillet: 11.5 mm, written as the material it takes off along each edge
    with BuildSketch(Plane(origin=(-22.24135787, -12.825287419, 2.012945375), x_dir=(0, -1.0, 1.3077435417698884e-12), z_dir=(1, 0, 0))) as fillet_9_piece_1:
        with BuildLine():
            CenterArc((11.5, -3.655071281), FILLET_9_R, 161.468118769, 18.531881231)
            Line((0, -3.655071281), (0, 0))
            Line((0, 0), (0.596310077, 0))
        make_face()
    extrude(amount=12.990377478, mode=Mode.SUBTRACT)

    # 圆角11
    # the kernel refuses this fillet: 2 mm, written as the material it takes off along each edge
    with BuildSketch(Plane(origin=(-9.250980392, -10.825287419, 7), x_dir=(0, 0, 1), z_dir=(-1, 0, 0))) as fillet_11_piece_1:
        with BuildLine():
            CenterArc((FILLET_11_R, -FILLET_11_R), FILLET_11_R, 90, 90)
            Line((0, -FILLET_11_R), (0, 0))
            Line((0, 0), (FILLET_11_R, 0))
        make_face()
    extrude(amount=12.9, mode=Mode.SUBTRACT)

    # 圆角12
    fillet_12_edges = [part.edges().sort_by_distance(p)[0] for p in [
        (-7.72802616, -17.319235473, 6.25),
        (-23.673934624, -17.319235473, 6.25),
        (-7.72802616, 20.692685664, 6.25),
        (-23.673934624, 20.692685664, 6.25),
    ]]
    fillet(fillet_12_edges, radius=FILLET_12_R)

    # 草图49 → 切除-拉伸22 (cut, through all)
    with BuildSketch(Plane(origin=(0, 0, -3.5), x_dir=(-1, 0, 0), z_dir=(0, 0, -1))):
        with Locations(Location((5.628696747, -14.974790003, 0), (0, 0, 90))):
            Circle(SKETCH_49_R)
        with Locations(Location((25.773264037, -14.974790003, 0), (0, 0, 90))):
            Circle(SKETCH_49_R_2)
    extrude(amount=-CUT_EXTRUDE_22_DEPTH, mode=Mode.SUBTRACT)


solid = part.part
